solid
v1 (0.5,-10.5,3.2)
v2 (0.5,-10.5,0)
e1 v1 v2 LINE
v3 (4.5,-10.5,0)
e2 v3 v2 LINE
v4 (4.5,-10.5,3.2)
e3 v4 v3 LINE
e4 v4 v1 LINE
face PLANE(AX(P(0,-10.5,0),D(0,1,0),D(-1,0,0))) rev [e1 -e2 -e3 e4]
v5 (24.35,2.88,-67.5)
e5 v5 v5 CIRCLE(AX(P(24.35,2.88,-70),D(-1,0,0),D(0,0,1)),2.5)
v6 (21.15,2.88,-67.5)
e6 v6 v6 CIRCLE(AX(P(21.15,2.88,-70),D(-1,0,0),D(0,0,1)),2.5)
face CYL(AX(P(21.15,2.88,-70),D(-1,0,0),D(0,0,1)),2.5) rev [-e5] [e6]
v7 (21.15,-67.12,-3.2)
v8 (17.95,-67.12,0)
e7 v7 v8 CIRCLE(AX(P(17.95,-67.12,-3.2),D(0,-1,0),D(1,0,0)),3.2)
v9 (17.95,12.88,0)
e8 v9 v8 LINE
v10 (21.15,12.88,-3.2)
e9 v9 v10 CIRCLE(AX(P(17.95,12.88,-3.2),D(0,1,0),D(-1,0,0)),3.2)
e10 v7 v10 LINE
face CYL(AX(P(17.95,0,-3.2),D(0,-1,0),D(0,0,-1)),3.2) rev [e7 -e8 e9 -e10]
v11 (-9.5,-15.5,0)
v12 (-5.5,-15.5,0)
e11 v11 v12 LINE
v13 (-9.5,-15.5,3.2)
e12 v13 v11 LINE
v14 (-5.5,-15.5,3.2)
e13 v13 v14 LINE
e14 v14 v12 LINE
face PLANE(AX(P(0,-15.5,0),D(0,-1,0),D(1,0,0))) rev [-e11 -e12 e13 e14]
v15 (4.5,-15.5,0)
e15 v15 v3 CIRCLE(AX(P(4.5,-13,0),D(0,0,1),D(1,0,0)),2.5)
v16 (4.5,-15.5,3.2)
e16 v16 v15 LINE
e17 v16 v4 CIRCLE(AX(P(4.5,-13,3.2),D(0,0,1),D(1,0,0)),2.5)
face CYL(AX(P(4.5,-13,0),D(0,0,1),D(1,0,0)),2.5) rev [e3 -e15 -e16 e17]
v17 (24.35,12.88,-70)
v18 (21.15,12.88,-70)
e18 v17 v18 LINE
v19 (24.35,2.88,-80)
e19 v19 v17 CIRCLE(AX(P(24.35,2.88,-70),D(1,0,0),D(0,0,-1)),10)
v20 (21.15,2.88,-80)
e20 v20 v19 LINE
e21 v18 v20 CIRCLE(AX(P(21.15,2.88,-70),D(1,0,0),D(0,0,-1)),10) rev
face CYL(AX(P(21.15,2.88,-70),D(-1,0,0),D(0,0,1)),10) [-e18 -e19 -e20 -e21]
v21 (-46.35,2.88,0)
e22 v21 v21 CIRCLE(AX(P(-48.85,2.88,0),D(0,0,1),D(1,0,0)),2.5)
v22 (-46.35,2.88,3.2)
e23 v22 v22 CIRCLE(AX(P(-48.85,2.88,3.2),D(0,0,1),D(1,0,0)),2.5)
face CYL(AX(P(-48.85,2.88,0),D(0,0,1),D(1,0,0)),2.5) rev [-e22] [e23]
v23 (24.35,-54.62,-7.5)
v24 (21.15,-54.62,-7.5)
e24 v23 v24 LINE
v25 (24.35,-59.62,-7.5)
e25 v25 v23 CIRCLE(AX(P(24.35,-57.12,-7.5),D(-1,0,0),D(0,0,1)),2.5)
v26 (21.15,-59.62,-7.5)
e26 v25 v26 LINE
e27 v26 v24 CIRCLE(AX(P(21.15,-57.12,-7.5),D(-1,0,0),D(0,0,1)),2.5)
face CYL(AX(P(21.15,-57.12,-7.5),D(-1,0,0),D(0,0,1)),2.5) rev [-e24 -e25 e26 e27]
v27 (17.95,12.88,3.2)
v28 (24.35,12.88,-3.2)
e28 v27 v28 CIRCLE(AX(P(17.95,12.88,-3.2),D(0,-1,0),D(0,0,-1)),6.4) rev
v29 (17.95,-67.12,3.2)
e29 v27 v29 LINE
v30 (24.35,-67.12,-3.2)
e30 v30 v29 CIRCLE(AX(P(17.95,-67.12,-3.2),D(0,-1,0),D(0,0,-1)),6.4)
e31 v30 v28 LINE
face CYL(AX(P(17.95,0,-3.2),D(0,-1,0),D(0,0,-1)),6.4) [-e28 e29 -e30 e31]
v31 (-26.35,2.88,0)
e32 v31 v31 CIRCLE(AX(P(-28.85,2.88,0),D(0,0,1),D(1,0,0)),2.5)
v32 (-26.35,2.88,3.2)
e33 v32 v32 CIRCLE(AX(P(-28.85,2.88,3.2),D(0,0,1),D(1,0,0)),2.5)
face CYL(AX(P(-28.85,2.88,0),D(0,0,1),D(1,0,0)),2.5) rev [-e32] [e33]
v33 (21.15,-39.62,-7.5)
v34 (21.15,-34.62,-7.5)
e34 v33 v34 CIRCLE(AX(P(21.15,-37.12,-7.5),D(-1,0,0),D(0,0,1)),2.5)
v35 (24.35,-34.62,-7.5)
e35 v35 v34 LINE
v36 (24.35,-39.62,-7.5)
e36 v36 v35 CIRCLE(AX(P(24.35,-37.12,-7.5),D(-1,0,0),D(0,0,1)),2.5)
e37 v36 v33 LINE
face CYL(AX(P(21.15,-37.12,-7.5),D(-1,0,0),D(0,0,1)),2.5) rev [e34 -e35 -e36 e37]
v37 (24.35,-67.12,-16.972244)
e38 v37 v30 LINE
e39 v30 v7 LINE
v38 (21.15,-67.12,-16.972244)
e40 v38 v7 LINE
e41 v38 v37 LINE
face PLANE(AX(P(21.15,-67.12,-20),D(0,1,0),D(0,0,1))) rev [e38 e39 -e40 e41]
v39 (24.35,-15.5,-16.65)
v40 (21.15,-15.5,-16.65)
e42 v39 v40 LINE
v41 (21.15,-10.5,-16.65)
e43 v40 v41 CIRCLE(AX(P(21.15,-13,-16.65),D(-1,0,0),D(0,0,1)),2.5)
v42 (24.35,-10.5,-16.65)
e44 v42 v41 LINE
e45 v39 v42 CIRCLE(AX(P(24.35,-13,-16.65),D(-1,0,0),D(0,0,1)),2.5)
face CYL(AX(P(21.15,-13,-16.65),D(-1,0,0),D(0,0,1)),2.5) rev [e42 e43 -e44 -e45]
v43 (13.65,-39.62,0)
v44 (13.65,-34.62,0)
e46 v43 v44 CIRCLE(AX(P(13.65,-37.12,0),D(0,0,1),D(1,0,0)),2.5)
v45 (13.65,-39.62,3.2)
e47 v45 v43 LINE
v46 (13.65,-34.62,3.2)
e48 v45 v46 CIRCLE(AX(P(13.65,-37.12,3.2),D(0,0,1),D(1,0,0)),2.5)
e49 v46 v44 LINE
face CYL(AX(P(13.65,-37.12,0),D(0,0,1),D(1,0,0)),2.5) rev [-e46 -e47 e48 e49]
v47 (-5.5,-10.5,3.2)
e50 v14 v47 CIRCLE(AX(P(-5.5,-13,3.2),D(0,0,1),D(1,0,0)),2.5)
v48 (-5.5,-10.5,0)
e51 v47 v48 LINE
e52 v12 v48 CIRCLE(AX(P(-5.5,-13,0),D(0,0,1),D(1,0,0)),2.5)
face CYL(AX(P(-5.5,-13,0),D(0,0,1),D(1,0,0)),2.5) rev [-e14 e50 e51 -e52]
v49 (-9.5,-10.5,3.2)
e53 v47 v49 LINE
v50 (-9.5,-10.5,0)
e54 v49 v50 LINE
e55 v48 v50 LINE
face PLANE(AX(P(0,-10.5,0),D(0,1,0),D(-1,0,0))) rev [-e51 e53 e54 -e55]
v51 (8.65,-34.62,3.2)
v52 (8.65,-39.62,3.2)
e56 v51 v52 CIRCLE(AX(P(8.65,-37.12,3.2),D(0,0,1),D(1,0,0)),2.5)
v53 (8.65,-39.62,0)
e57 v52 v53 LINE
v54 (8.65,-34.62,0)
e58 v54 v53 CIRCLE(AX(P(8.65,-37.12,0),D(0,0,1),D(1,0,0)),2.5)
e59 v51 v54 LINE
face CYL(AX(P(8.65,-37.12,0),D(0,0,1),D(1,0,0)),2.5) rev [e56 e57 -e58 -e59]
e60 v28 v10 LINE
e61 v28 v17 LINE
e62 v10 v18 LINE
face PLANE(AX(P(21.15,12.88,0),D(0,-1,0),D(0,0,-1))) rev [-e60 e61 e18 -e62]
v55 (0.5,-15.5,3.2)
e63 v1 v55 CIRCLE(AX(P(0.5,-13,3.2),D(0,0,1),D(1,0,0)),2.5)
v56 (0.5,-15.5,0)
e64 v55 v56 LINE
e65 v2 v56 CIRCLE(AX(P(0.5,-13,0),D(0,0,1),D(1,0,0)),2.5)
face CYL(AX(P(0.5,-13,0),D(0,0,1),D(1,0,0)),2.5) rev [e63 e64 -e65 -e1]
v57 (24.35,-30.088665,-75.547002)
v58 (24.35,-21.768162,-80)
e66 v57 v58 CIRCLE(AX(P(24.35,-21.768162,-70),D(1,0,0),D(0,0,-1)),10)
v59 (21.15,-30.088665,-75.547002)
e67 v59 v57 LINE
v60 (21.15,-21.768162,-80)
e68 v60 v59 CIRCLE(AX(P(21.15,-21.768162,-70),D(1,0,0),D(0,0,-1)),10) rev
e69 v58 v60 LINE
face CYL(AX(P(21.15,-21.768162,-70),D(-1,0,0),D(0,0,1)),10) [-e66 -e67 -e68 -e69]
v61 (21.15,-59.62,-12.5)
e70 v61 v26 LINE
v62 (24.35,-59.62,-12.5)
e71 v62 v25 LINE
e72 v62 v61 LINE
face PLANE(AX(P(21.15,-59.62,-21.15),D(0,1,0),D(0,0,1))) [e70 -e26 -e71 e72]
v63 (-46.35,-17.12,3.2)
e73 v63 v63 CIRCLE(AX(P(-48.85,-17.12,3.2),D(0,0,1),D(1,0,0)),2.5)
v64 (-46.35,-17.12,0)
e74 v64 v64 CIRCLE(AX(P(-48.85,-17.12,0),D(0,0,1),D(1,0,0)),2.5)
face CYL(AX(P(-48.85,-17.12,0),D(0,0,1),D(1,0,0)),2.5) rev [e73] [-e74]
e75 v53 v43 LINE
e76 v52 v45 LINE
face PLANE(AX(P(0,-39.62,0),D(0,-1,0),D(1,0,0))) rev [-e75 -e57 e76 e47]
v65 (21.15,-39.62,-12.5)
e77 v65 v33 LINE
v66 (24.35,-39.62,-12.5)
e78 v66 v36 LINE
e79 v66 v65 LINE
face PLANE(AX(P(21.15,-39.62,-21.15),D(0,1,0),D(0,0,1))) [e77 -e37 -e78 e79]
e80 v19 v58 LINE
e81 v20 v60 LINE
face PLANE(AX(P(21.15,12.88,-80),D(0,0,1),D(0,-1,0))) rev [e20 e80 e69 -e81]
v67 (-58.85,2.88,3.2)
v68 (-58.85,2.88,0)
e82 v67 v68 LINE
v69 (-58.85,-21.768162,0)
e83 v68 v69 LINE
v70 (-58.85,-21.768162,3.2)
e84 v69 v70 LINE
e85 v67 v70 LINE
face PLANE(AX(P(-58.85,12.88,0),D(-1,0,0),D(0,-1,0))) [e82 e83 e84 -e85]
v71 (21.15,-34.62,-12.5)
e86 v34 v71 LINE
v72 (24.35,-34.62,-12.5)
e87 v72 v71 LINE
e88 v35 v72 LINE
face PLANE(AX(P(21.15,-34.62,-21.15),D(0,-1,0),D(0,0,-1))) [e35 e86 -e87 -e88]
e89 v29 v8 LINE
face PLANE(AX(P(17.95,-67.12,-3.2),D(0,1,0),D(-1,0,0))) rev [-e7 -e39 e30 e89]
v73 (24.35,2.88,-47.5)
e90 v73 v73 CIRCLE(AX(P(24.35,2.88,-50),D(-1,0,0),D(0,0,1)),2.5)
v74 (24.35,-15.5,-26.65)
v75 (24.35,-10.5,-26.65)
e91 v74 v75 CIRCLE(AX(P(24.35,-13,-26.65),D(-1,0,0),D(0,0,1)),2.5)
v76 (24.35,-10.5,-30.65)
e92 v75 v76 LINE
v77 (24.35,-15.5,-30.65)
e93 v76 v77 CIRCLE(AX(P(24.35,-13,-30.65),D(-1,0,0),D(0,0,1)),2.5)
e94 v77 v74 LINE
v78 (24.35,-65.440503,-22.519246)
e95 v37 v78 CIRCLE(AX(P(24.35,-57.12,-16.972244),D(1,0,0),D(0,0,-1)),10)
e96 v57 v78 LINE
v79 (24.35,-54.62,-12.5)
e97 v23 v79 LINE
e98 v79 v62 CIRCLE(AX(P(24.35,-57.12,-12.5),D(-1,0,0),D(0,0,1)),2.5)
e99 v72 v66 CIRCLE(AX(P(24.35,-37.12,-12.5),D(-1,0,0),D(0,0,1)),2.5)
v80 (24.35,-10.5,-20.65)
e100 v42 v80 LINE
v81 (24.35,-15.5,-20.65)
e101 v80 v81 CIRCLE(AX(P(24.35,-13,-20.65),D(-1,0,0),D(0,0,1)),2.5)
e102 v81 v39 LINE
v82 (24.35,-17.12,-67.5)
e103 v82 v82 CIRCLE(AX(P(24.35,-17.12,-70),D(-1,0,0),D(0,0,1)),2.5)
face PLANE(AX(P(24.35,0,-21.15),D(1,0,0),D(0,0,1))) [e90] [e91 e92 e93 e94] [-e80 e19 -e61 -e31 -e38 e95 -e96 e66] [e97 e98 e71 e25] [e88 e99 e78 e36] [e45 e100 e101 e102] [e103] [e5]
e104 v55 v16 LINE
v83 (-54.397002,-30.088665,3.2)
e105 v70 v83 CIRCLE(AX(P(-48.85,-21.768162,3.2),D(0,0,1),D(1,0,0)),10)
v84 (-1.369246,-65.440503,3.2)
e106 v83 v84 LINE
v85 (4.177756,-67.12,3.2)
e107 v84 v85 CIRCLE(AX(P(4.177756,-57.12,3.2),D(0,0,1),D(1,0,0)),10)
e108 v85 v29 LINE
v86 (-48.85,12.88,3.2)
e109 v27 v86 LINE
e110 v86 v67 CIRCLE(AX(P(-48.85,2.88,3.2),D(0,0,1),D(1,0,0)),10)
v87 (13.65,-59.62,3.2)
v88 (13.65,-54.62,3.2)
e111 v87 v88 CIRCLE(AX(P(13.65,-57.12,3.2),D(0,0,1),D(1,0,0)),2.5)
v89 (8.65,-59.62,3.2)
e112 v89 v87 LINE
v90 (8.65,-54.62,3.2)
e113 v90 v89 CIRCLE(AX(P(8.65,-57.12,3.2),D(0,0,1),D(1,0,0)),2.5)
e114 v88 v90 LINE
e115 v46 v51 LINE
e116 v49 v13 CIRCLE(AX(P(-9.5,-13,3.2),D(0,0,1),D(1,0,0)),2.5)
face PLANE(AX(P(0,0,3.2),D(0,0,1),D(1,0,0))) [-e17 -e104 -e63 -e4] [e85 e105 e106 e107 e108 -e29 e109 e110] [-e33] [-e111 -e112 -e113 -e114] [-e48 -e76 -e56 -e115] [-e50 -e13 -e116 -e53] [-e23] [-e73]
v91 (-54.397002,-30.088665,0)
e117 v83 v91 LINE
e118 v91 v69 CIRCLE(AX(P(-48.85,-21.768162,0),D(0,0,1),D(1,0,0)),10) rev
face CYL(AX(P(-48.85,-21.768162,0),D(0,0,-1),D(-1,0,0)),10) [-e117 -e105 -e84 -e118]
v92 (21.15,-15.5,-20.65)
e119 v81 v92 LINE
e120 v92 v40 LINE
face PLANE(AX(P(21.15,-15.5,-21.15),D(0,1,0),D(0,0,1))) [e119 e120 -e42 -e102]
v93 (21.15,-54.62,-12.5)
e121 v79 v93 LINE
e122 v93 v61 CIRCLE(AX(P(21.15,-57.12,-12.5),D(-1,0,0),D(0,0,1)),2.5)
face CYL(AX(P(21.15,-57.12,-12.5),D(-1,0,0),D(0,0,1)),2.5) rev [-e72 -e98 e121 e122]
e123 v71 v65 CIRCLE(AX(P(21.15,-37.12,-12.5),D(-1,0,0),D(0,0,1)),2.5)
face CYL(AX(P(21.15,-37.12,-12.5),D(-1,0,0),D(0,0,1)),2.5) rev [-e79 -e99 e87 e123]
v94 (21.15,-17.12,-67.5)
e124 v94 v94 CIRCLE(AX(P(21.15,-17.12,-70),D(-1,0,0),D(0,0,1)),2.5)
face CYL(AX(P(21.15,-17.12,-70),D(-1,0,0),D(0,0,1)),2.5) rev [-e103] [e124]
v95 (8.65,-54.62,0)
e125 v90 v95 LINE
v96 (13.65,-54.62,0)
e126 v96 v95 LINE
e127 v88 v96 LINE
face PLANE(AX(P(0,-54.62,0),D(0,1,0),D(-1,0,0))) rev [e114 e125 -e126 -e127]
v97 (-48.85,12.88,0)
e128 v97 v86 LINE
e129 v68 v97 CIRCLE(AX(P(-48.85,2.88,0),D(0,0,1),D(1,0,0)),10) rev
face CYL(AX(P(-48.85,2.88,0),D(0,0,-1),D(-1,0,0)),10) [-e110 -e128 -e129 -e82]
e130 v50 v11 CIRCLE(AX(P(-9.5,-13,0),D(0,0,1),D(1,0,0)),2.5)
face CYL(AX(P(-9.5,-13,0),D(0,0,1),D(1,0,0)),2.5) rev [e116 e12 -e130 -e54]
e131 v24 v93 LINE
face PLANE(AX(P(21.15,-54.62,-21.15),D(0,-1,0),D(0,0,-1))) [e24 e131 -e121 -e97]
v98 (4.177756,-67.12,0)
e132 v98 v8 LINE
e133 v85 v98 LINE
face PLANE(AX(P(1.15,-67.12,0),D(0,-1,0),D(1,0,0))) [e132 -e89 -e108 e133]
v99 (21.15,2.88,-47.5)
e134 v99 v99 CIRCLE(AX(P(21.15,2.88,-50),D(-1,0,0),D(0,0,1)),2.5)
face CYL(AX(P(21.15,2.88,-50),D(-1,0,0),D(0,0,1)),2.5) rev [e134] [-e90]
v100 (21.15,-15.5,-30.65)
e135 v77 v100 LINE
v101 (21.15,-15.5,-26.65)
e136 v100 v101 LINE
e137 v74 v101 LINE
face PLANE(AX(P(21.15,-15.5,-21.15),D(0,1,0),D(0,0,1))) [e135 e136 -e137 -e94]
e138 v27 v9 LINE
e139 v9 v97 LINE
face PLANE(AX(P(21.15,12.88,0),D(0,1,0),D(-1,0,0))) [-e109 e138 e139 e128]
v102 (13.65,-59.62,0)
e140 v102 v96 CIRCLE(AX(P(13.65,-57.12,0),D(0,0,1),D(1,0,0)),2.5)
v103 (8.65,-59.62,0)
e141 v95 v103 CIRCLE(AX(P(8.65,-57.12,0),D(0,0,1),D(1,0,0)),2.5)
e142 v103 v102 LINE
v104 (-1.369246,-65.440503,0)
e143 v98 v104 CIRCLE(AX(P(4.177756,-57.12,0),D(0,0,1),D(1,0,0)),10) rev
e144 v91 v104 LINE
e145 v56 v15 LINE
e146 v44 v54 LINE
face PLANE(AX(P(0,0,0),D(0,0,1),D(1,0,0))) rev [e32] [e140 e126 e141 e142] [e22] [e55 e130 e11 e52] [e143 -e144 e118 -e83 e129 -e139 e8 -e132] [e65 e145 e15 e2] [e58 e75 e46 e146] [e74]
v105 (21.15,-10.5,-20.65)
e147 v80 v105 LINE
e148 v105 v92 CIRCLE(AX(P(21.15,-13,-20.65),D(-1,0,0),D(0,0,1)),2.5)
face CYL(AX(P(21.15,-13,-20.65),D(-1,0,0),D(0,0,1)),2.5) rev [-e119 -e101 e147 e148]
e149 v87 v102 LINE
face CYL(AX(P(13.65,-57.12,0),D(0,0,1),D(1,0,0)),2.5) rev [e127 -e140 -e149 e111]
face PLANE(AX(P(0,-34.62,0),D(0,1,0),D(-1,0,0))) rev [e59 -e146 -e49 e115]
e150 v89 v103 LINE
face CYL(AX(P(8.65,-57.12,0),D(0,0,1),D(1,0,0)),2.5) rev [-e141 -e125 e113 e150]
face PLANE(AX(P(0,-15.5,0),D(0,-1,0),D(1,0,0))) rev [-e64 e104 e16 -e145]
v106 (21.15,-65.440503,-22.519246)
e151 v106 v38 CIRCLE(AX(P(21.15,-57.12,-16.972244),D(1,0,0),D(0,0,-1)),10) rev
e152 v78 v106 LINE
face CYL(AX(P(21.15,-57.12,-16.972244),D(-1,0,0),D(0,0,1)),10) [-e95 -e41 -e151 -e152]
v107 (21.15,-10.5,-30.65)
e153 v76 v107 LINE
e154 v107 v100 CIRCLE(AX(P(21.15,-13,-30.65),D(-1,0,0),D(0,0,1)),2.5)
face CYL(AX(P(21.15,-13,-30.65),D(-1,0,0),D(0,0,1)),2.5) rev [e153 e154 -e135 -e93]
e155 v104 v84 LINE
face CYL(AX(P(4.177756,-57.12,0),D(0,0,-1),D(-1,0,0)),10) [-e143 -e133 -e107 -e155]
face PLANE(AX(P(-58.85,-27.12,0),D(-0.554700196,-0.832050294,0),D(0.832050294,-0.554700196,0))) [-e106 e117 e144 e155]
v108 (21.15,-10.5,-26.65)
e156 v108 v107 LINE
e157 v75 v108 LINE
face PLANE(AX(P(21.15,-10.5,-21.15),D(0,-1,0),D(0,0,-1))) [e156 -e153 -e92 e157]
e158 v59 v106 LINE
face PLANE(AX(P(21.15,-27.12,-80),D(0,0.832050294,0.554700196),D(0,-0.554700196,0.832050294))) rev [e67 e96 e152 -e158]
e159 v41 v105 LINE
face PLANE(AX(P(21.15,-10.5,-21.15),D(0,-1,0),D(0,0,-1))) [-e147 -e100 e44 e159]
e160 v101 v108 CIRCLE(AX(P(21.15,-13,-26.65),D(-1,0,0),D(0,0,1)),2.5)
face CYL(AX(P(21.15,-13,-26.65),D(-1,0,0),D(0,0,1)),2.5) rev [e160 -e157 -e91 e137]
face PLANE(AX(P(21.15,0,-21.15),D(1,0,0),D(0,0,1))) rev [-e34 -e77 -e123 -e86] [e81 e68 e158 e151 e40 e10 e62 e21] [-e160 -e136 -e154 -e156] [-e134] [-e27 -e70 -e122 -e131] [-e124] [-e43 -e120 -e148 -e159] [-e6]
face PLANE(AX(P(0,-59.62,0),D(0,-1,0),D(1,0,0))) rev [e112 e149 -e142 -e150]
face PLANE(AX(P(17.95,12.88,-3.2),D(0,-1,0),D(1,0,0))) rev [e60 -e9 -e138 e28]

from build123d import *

# Parameters (mm, degrees)
BOSS_EXTRUDE1_DEPTH        = 3.175
SKETCH2_R                  = 2.5
CUT_EXTRUDE2_DEPTH         = 10
SKETCH8_W                  = 3.175
SKETCH8_H                  = 3.175
BOSS_EXTRUDE2_DEPTH        = 80
CONVERT_SOLID2_START       = 2.233560192
CONVERT_SOLID2_OUTLINE_W   = 3.175
CONVERT_SOLID2_OUTLINE_H   = 23.379999999
CONVERT_SOLID2_OUTLINE_H_2 = 19.120000001
CONVERT_SOLID2_OUTLINE_H_3 = 15
CONVERT_SOLID2_DEPTH       = 0.941439808
CONVERT_SOLID2_START_2     = -3.2
CONVERT_SOLID2_2_OUTLINE_R = 2.5
CONVERT_SOLID2_2_DEPTH     = 3.650867885
CONVERT_SOLID2_START_3     = -80
CONVERT_SOLID2_3_OUTLINE_W = 0.025
CONVERT_SOLID2_3_OUTLINE_H = 80
CONVERT_SOLID2_3_DEPTH     = 77.404032
CONVERT_SOLID2_START_4     = 3.175
CONVERT_SOLID2_4_OUTLINE_R = 2.5
CONVERT_SOLID2_4_DEPTH     = 0.025
CONVERT_SOLID2_START_5     = -54.620000001
CONVERT_SOLID2_5_DEPTH     = 67.5
CONVERT_SOLID2_START_6     = -67.120000001
CONVERT_SOLID2_6_DEPTH     = 80
CONVERT_SOLID2_START_7     = 24.325
CONVERT_SOLID2_7_OUTLINE_R = 2.5
CONVERT_SOLID2_7_DEPTH     = 0.675
FILLET1_R                  = 10


with BuildPart() as part:
    # Sketch1 → Boss-Extrude1 (new body)
    with BuildSketch(Plane.XY):
        Polygon((-58.85, 12.879999999), (-58.85, -27.120000001), (1.15, -67.120000001), (21.15, -67.120000001), (21.15, 12.879999999), align=None)
    extrude(amount=BOSS_EXTRUDE1_DEPTH)

    # Sketch2 → Cut-Extrude2 (cut)
    with BuildSketch(Plane.XY.offset(3.175)):
        with Locations((-48.85, 2.879999999)):
            Circle(SKETCH2_R)
        with Locations((-48.85, -17.12)):
            Circle(SKETCH2_R)
        with Locations((-28.85, 2.879999999)):
            Circle(SKETCH2_R)
        with BuildLine():
            Line((8.65, -54.620000001), (13.65, -54.620000001))
            ThreePointArc((13.65, -54.620000001), (16.15, -57.120000001), (13.65, -59.620000001))
            Line((13.65, -59.620000001), (8.65, -59.620000001))
            ThreePointArc((8.65, -59.620000001), (6.15, -57.120000001), (8.65, -54.620000001))
        make_face()
        with BuildLine():
            Line((8.65, -34.620000001), (13.65, -34.620000001))
            ThreePointArc((13.65, -34.620000001), (16.15, -37.120000001), (13.65, -39.620000001))
            Line((13.65, -39.620000001), (8.65, -39.620000001))
            ThreePointArc((8.65, -39.620000001), (6.15, -37.120000001), (8.65, -34.620000001))
        make_face()
        with BuildLine():
            Line((-5.5, -15.5), (-9.5, -15.5))
            ThreePointArc((-9.5, -15.5), (-12, -13), (-9.5, -10.5))
            Line((-9.5, -10.5), (-5.5, -10.5))
            ThreePointArc((-5.5, -10.5), (-3, -13), (-5.5, -15.5))
        make_face()
        with BuildLine():
            Line((0.5, -10.5), (4.5, -10.5))
            ThreePointArc((4.5, -10.5), (7, -13), (4.5, -15.5))
            Line((4.5, -15.5), (0.5, -15.5))
            ThreePointArc((0.5, -15.5), (-2, -13), (0.5, -10.5))
        make_face()
    extrude(amount=-CUT_EXTRUDE2_DEPTH, mode=Mode.SUBTRACT)


with BuildPart() as body_2:
    # Mirror1: mirrored copy
    add(part.part.mirror(Plane(origin=(10.575, 0, -10.575), x_dir=(0.7071067811865489, 0, 0.7071067811865462), z_dir=(0.7071067811865464, 0, -0.7071067811865488))))


with BuildPart() as part_1:
    add(part.part)

    add(body_2.part)  # Boss-Extrude2 merges body 2
    # Sketch8 → Boss-Extrude2 (add, through all)
    with BuildSketch(Plane(origin=(0, 12.879999999, 0), x_dir=(1, 0, 0), z_dir=(0, 1, 0))):
        with Locations((22.7375, -1.5875)):
            Rectangle(SKETCH8_W, SKETCH8_H)
    extrude(amount=-BOSS_EXTRUDE2_DEPTH)

    # Convert-Solid2: read off the stored shape, not the designer's step
    # Convert-Solid2 outline → Convert-Solid2 (cut)
    with BuildSketch(Plane.XY.offset(CONVERT_SOLID2_START)):
        with Locations((22.7375, 1.19)):
            Rectangle(CONVERT_SOLID2_OUTLINE_W, CONVERT_SOLID2_OUTLINE_H)
        with Locations((22.7375, -25.060000001)):
            Rectangle(CONVERT_SOLID2_OUTLINE_W, CONVERT_SOLID2_OUTLINE_H_2)
        with Locations((22.7375, -47.120000001)):
            Rectangle(CONVERT_SOLID2_OUTLINE_W, CONVERT_SOLID2_OUTLINE_H_3)
    extrude(amount=CONVERT_SOLID2_DEPTH, mode=Mode.SUBTRACT)

    # Convert-Solid2 2 outline → Convert-Solid2 2 (add)
    with BuildSketch(Plane.XY.offset(CONVERT_SOLID2_START_2)):
        Polygon((21.15, 12.879999999), (-58.85, 12.879999999), (-58.85, -27.120000001), (1.15, -67.120000001), (21.15, -67.120000001), align=None)
        with BuildLine():
            Line((13.65, -59.620000001), (8.65, -59.620000001))
            ThreePointArc((8.65, -59.620000001), (6.15, -57.120000001), (8.65, -54.620000001))
            Line((8.65, -54.620000001), (13.65, -54.620000001))
            ThreePointArc((13.65, -54.620000001), (16.15, -57.120000001), (13.65, -59.620000001))
        make_face(mode=Mode.SUBTRACT)
        with BuildLine():
            Line((13.65, -39.620000001), (8.65, -39.620000001))
            ThreePointArc((8.65, -39.620000001), (6.15, -37.120000001), (8.65, -34.620000001))
            Line((8.65, -34.620000001), (13.65, -34.620000001))
            ThreePointArc((13.65, -34.620000001), (16.15, -37.120000001), (13.65, -39.620000001))
        make_face(mode=Mode.SUBTRACT)
        with Locations((-48.85, -17.12)):
            Circle(CONVERT_SOLID2_2_OUTLINE_R, mode=Mode.SUBTRACT)
        with Locations((-48.85, 2.879999999)):
            Circle(CONVERT_SOLID2_2_OUTLINE_R, mode=Mode.SUBTRACT)
        with Locations((-28.85, 2.879999999)):
            Circle(CONVERT_SOLID2_2_OUTLINE_R, mode=Mode.SUBTRACT)
        with BuildLine():
            Line((-9.5, -10.5), (-5.5, -10.5))
            ThreePointArc((-5.5, -10.5), (-3, -13), (-5.5, -15.5))
            Line((-5.5, -15.5), (-9.5, -15.5))
            ThreePointArc((-9.5, -15.5), (-12, -13), (-9.5, -10.5))
        make_face(mode=Mode.SUBTRACT)
        with BuildLine():
            Line((0.5, -10.5), (4.5, -10.5))
            ThreePointArc((4.5, -10.5), (7, -13), (4.5, -15.5))
            Line((4.5, -15.5), (0.5, -15.5))
            ThreePointArc((0.5, -15.5), (-2, -13), (0.5, -10.5))
        make_face(mode=Mode.SUBTRACT)
    extrude(amount=CONVERT_SOLID2_2_DEPTH)

    # Convert-Solid2 3 outline → Convert-Solid2 3 (add)
    with BuildSketch(Plane.XY.offset(CONVERT_SOLID2_START_3)):
        with Locations((24.3375, -27.120000001)):
            Rectangle(CONVERT_SOLID2_3_OUTLINE_W, CONVERT_SOLID2_3_OUTLINE_H)
    extrude(amount=CONVERT_SOLID2_3_DEPTH)

    # Convert-Solid2 4 outline → Convert-Solid2 4 (add)
    with BuildSketch(Plane.XY.offset(CONVERT_SOLID2_START_4)):
        Polygon((21.15, 12.879999999), (-58.85, 12.879999999), (-58.85, -27.120000001), (1.15, -67.120000001), (21.15, -67.120000001), align=None)
        with BuildLine():
            Line((13.65, -59.620000001), (8.65, -59.620000001))
            ThreePointArc((8.65, -59.620000001), (6.15, -57.120000001), (8.65, -54.620000001))
            Line((8.65, -54.620000001), (13.65, -54.620000001))
            ThreePointArc((13.65, -54.620000001), (16.15, -57.120000001), (13.65, -59.620000001))
        make_face(mode=Mode.SUBTRACT)
        with BuildLine():
            Line((13.65, -39.620000001), (8.65, -39.620000001))
            ThreePointArc((8.65, -39.620000001), (6.15, -37.120000001), (8.65, -34.620000001))
            Line((8.65, -34.620000001), (13.65, -34.620000001))
            ThreePointArc((13.65, -34.620000001), (16.15, -37.120000001), (13.65, -39.620000001))
        make_face(mode=Mode.SUBTRACT)
        with Locations((-48.85, -17.12)):
            Circle(CONVERT_SOLID2_4_OUTLINE_R, mode=Mode.SUBTRACT)
        with Locations((-48.85, 2.879999999)):
            Circle(CONVERT_SOLID2_4_OUTLINE_R, mode=Mode.SUBTRACT)
        with Locations((-28.85, 2.879999999)):
            Circle(CONVERT_SOLID2_4_OUTLINE_R, mode=Mode.SUBTRACT)
        with BuildLine():
            Line((-9.5, -10.5), (-5.5, -10.5))
            ThreePointArc((-5.5, -10.5), (-3, -13), (-5.5, -15.5))
            Line((-5.5, -15.5), (-9.5, -15.5))
            ThreePointArc((-9.5, -15.5), (-12, -13), (-9.5, -10.5))
        make_face(mode=Mode.SUBTRACT)
        with BuildLine():
            Line((0.5, -10.5), (4.5, -10.5))
            ThreePointArc((4.5, -10.5), (7, -13), (4.5, -15.5))
            Line((4.5, -15.5), (0.5, -15.5))
            ThreePointArc((0.5, -15.5), (-2, -13), (0.5, -10.5))
        make_face(mode=Mode.SUBTRACT)
    extrude(amount=CONVERT_SOLID2_4_DEPTH)

    # Convert-Solid2 5 outline → Convert-Solid2 5 (add)
    with BuildSketch(Plane(origin=(0, 0, 0), x_dir=(1, 0, 0), z_dir=(0, 1, 0)).offset(CONVERT_SOLID2_START_5)):
        with BuildLine():
            Line((21.15, -2.233560192), (21.15, -2.342562585))
            ThreePointArc((21.15, -2.342562585), (21.241340362, -2.288813955), (21.331778178, -2.233560192))
            Line((21.331778178, -2.233560192), (21.15, -2.233560192))
        make_face()
    extrude(amount=CONVERT_SOLID2_5_DEPTH)

    # Convert-Solid2 6 outline → Convert-Solid2 6 (cut)
    with BuildSketch(Plane(origin=(0, 0, 0), x_dir=(1, 0, 0), z_dir=(0, 1, 0)).offset(CONVERT_SOLID2_START_6)):
        with BuildLine():
            Line((-58.85, 3.2), (-58.85, 0))
            Line((-58.85, 0), (17.95, 0))
            ThreePointArc((17.95, 0), (20.2127417, 0.9372583), (21.15, 3.2))
            Line((21.15, 3.2), (-58.85, 3.2))
        make_face()
        with BuildLine():
            Line((17.95, -3.2), (21.15, -3.2))
            Line((21.15, -3.2), (21.15, -3.175))
            Line((21.15, -3.175), (24.325, -3.175))
            Line((24.325, -3.175), (24.325, 2.595968))
            Line((24.325, 2.595968), (24.35, 2.595968))
            Line((24.35, 2.595968), (24.35, 3.2))
            ThreePointArc((24.35, 3.2), (22.4754834, -1.3254834), (17.95, -3.2))
        make_face()
    extrude(amount=CONVERT_SOLID2_6_DEPTH, mode=Mode.SUBTRACT)

    # Convert-Solid2 7 outline → Convert-Solid2 7 (cut)
    with BuildSketch(Plane.YZ.offset(CONVERT_SOLID2_START_7)):
        Polygon((-27.120000001, -80), (-67.120000001, -20), (-67.120000001, -80), align=None)
        with BuildLine():
            Line((-59.620000001, -7.5), (-59.620000001, -12.5))
            ThreePointArc((-59.620000001, -12.5), (-57.120000001, -15), (-54.620000001, -12.5))
            Line((-54.620000001, -12.5), (-54.620000001, -7.5))
            ThreePointArc((-54.620000001, -7.5), (-57.120000001, -5), (-59.620000001, -7.5))
        make_face()
        with BuildLine():
            Line((-39.620000001, -7.5), (-39.620000001, -12.5))
            ThreePointArc((-39.620000001, -12.5), (-37.120000001, -15), (-34.620000001, -12.5))
            Line((-34.620000001, -12.5), (-34.620000001, -7.5))
            ThreePointArc((-34.620000001, -7.5), (-37.120000001, -5), (-39.620000001, -7.5))
        make_face()
        with BuildLine():
            Line((-10.5, -30.65), (-10.5, -26.65))
            ThreePointArc((-10.5, -26.65), (-13, -24.15), (-15.5, -26.65))
            Line((-15.5, -26.65), (-15.5, -30.65))
            ThreePointArc((-15.5, -30.65), (-13, -33.15), (-10.5, -30.65))
        make_face()
        with BuildLine():
            Line((-10.5, -20.65), (-10.5, -16.65))
            ThreePointArc((-10.5, -16.65), (-13, -14.15), (-15.5, -16.65))
            Line((-15.5, -16.65), (-15.5, -20.65))
            ThreePointArc((-15.5, -20.65), (-13, -23.15), (-10.5, -20.65))
        make_face()
        with Locations((2.879999999, -50)):
            Circle(CONVERT_SOLID2_7_OUTLINE_R)
        with Locations((-17.12, -70)):
            Circle(CONVERT_SOLID2_7_OUTLINE_R)
        with Locations((2.879999999, -70)):
            Circle(CONVERT_SOLID2_7_OUTLINE_R)
    extrude(amount=CONVERT_SOLID2_7_DEPTH, mode=Mode.SUBTRACT)

    # Fillet1
    fillet1_edges = [part_1.edges().sort_by_distance(p)[0] for p in [
        (1.15, -67.120000001, 1.5875),
        (22.7375, -67.120000001, -20),
        (22.7375, -27.120000001, -80),
        (22.7375, 12.879999999, -80),
        (-58.85, 12.879999999, 1.5875),
        (-58.85, -27.120000001, 1.5875),
    ]]
    fillet(fillet1_edges, radius=FILLET1_R)


solid = part_1.part
